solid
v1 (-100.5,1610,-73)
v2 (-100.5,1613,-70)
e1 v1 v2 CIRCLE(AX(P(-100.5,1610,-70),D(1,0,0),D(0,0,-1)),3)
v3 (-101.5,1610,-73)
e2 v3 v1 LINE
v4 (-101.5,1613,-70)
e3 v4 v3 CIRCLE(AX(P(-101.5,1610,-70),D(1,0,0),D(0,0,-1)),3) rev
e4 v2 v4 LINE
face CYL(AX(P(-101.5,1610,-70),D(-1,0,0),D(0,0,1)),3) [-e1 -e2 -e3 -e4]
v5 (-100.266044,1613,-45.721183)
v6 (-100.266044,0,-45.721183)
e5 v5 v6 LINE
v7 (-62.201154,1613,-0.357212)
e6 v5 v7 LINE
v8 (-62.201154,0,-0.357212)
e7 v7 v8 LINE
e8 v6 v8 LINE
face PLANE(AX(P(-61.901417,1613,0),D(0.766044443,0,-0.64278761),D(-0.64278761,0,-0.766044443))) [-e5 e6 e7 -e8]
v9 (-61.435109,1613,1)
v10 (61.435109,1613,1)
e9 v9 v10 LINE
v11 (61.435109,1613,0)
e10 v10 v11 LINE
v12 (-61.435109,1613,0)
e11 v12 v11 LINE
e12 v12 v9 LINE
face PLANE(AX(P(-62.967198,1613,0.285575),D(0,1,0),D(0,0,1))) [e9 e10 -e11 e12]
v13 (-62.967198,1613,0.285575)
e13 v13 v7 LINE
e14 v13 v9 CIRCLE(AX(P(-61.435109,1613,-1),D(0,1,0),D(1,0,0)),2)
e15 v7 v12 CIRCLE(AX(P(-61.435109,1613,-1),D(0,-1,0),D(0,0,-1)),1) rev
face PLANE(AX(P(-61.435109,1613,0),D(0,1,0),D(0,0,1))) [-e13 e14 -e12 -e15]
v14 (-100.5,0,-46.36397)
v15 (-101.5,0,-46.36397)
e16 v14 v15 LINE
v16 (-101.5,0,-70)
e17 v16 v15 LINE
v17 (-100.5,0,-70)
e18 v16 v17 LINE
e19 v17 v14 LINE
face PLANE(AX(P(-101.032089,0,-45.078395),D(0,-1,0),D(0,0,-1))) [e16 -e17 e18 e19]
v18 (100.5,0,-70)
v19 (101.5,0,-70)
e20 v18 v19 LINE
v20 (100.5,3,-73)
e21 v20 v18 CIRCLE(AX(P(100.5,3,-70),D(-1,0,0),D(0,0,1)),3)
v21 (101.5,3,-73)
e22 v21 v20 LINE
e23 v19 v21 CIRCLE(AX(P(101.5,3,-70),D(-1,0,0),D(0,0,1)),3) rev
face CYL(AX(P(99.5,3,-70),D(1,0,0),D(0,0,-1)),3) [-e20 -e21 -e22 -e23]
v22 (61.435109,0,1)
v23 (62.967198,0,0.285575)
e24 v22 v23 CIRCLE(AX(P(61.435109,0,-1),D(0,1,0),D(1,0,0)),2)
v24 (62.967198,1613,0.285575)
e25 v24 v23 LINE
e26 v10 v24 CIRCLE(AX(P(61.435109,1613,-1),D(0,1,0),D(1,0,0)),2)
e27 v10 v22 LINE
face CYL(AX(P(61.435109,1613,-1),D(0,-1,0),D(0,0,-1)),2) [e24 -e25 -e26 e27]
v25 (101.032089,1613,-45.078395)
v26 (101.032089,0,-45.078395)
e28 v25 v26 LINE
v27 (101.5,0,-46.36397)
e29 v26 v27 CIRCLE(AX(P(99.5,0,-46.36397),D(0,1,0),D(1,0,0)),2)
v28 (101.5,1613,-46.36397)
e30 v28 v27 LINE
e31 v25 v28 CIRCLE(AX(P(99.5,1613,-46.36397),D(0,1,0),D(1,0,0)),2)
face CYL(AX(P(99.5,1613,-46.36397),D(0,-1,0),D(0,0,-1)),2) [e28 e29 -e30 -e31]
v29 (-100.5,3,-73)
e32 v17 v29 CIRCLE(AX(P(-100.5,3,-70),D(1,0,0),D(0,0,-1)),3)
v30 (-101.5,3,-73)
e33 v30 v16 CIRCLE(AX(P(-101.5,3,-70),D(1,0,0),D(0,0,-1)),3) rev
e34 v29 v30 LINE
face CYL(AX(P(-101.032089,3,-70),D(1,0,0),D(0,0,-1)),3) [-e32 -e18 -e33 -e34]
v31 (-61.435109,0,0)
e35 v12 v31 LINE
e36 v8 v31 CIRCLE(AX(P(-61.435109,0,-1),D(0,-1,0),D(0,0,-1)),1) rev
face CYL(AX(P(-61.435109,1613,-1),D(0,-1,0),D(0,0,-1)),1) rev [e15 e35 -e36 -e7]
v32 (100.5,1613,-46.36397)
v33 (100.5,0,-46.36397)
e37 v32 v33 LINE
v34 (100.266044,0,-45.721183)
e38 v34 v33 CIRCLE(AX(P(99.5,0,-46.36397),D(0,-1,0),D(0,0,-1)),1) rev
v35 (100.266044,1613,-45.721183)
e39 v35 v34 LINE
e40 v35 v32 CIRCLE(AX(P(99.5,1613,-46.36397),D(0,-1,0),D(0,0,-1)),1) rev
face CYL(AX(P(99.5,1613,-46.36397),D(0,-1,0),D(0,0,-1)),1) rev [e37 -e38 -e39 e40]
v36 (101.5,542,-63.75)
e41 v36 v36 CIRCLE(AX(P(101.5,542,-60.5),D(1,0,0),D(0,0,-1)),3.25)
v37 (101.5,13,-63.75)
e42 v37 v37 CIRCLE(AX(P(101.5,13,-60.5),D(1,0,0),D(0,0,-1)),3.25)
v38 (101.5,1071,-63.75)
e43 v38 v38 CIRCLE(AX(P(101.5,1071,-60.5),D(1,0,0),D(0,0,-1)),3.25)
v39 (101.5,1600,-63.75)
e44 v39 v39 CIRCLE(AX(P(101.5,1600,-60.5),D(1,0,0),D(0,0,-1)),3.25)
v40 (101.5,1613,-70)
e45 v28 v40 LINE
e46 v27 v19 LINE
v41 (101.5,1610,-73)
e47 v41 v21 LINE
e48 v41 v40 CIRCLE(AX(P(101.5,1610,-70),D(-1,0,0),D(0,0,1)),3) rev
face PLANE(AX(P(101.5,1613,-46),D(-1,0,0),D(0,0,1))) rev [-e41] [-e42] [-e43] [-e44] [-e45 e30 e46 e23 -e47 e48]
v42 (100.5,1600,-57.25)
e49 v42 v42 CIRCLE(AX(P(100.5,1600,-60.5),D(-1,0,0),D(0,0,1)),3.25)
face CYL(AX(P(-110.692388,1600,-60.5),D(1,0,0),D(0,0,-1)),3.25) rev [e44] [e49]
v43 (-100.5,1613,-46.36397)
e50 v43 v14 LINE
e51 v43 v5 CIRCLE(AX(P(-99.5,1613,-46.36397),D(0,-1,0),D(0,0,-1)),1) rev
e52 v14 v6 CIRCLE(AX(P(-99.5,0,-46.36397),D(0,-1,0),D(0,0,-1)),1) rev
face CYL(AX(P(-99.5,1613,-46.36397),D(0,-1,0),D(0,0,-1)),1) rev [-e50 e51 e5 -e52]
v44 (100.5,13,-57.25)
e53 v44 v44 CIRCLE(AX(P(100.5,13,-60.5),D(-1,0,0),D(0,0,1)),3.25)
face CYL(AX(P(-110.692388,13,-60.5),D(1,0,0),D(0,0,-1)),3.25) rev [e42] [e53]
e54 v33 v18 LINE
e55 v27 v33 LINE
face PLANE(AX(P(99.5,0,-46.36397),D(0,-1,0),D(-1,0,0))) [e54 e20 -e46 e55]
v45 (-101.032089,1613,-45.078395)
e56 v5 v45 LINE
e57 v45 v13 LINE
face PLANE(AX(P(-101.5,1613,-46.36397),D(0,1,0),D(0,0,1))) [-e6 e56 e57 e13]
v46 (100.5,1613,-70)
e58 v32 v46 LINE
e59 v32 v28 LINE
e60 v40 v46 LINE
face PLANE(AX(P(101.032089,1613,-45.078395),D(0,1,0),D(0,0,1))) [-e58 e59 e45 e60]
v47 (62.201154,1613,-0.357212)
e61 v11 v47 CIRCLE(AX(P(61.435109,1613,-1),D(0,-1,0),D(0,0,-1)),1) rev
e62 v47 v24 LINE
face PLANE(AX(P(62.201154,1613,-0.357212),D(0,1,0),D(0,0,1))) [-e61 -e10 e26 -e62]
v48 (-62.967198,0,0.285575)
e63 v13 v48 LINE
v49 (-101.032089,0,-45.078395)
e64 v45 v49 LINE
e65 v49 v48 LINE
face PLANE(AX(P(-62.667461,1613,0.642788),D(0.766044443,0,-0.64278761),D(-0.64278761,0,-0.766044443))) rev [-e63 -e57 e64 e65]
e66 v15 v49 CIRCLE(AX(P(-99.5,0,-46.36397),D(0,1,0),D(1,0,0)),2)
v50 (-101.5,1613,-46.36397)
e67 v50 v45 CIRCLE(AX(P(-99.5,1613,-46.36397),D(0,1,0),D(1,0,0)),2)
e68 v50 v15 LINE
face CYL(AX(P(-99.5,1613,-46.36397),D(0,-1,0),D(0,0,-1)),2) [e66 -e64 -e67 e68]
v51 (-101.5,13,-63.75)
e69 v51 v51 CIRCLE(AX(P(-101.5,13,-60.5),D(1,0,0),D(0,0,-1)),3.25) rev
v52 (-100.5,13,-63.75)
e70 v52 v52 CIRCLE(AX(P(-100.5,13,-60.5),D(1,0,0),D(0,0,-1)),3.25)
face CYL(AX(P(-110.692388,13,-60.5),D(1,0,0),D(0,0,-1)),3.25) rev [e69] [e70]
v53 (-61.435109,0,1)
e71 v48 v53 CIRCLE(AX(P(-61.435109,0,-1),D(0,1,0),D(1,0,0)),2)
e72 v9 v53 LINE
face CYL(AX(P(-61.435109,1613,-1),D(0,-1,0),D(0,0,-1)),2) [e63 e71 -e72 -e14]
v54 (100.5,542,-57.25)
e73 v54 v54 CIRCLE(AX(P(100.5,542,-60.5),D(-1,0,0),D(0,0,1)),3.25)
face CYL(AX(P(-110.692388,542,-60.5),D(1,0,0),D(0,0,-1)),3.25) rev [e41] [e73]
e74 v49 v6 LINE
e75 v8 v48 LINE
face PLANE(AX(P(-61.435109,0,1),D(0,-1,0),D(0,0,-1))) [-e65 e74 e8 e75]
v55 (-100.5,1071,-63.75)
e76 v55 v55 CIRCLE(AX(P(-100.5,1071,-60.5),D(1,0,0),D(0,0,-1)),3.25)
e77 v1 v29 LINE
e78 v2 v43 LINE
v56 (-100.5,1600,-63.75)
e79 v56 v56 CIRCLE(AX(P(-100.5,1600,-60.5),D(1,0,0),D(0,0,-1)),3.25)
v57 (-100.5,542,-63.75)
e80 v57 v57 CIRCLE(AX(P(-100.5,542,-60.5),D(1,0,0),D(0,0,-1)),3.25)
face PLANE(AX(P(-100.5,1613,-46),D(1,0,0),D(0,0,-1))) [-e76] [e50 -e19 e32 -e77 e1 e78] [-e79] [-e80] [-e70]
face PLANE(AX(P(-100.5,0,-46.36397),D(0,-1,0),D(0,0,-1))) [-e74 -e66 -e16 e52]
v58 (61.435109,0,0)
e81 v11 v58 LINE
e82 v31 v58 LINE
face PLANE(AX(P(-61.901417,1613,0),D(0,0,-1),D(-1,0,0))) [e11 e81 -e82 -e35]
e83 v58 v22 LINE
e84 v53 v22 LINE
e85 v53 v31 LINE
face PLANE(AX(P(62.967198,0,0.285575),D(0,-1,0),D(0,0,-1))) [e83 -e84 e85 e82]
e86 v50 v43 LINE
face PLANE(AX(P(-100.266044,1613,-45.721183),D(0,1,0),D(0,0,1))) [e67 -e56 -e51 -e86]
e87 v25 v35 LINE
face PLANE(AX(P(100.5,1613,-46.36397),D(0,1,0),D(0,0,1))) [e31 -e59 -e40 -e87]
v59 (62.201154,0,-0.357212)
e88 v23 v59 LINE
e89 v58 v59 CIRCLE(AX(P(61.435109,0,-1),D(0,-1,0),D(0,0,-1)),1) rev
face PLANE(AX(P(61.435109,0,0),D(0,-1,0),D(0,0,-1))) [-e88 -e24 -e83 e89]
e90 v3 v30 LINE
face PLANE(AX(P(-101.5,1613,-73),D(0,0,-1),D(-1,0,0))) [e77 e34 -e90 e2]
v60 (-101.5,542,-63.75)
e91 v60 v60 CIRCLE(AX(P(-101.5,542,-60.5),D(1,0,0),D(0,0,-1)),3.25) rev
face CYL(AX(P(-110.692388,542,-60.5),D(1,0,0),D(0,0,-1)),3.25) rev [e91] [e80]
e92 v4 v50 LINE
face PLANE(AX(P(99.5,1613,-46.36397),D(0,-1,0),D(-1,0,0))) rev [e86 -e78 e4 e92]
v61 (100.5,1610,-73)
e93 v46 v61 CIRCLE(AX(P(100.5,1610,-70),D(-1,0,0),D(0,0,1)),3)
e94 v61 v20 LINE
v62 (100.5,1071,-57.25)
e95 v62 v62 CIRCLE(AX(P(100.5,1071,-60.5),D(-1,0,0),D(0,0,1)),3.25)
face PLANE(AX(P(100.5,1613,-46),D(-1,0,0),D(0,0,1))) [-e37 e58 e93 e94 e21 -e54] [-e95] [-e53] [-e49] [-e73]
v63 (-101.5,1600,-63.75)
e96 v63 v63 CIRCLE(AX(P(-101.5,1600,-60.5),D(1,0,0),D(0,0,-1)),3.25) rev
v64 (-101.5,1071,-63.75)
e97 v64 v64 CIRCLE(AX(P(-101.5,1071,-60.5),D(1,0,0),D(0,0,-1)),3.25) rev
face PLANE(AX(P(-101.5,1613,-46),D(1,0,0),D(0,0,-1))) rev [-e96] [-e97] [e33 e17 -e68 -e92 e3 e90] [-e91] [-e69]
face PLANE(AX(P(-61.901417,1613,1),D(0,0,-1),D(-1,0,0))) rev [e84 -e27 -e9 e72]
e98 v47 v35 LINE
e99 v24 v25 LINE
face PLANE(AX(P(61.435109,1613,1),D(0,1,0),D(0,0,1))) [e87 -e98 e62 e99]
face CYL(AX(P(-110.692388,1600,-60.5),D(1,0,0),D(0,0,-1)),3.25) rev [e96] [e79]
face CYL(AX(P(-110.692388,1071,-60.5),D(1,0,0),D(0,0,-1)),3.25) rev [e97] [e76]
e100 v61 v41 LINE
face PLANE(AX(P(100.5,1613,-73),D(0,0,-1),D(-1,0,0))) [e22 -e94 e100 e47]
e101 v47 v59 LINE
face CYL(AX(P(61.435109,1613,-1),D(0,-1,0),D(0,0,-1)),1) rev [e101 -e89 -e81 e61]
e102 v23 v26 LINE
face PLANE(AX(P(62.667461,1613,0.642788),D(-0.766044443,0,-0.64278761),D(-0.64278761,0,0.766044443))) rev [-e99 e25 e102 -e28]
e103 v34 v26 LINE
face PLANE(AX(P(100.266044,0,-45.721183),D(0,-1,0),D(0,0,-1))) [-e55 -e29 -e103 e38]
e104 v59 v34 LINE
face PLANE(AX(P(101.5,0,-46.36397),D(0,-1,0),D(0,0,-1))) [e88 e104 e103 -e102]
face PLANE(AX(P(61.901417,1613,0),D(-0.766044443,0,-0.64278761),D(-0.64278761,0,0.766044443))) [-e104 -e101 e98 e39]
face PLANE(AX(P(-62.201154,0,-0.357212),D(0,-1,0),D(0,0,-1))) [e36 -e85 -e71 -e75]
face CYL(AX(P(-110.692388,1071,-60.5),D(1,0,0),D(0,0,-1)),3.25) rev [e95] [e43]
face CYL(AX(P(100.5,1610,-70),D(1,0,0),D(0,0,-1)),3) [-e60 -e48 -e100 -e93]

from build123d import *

# Parameters (mm, degrees)
BASE_FLANGE1_DEPTH = 1613
FILLET1_R          = 3
CUT_EXTRUDE4_REACH = 1629.362
SKETCH10_R         = 3.25
LPATTERN5_COUNT    = 4
LPATTERN5_PITCH    = 529


# Sheet-metal steps are written as plain solids
with BuildPart() as part:
    # Sketch1 → Base-Flange1 (new body)
    with BuildSketch(Plane(origin=(0, 0, 0), x_dir=(1, 0, 0), z_dir=(0, 1, 0))):
        with BuildLine():
            Line((-100.5, 73), (-100.5, 46.363970234))
            ThreePointArc((-100.5, 46.363970234), (-100.439692621, 46.021950091), (-100.266044443, 45.721182625))
            Line((-100.266044443, 45.721182625), (-62.201153751, 0.35721239))
            ThreePointArc((-62.201153751, 0.35721239), (-61.857727569, 0.093692213), (-61.435109308, 0))
            Line((-61.435109308, 0), (61.435109308, 0))
            ThreePointArc((61.435109308, 0), (61.857727569, 0.093692213), (62.201153751, 0.35721239))
            Line((62.201153751, 0.35721239), (100.266044443, 45.721182625))
            ThreePointArc((100.266044443, 45.721182625), (100.439692621, 46.021950091), (100.5, 46.363970234))
            Line((100.5, 46.363970234), (100.5, 73))
            Line((100.5, 73), (101.5, 73))
            Line((101.5, 73), (101.5, 46.363970234))
            ThreePointArc((101.5, 46.363970234), (101.379385242, 45.679929948), (101.032088886, 45.078395015))
            Line((101.032088886, 45.078395015), (62.967198194, -0.285575219))
            ThreePointArc((62.967198194, -0.285575219), (62.280345831, -0.812615574), (61.435109308, -1))
            Line((61.435109308, -1), (-61.435109308, -1))
            ThreePointArc((-61.435109308, -1), (-62.280345831, -0.812615574), (-62.967198194, -0.285575219))
            Line((-62.967198194, -0.285575219), (-101.032088886, 45.078395015))
            ThreePointArc((-101.032088886, 45.078395015), (-101.379385242, 45.679929948), (-101.5, 46.363970234))
            Line((-101.5, 46.363970234), (-101.5, 73))
            Line((-101.5, 73), (-100.5, 73))
        make_face()
    extrude(amount=BASE_FLANGE1_DEPTH)

    # Fillet1
    fillet1_edges = [part.edges().sort_by_distance(p)[0] for p in [
        (-101, 0, -73),
        (101, 0, -73),
        (-101, 1613, -73),
        (101, 1613, -73),
    ]]
    fillet(fillet1_edges, radius=FILLET1_R)

    # Cut-Extrude4: up to this face of the body (flat: up to its plane)
    cut_extrude4_end = Plane(part.part.faces().sort_by_distance((-101.5, 806.5, -59.680847857))[0])
    # Sketch10 → Cut-Extrude4 (cut, up to the picked face)
    with BuildSketch(Plane(origin=(101.5, 0, 0), x_dir=(0, 0, -1), z_dir=(1, 0, 0)), mode=Mode.PRIVATE) as cut_extrude4_sk1:
        with Locations((60.5, 13)):
            Circle(SKETCH10_R)
    cut_extrude4_tool1 = split(extrude(cut_extrude4_sk1.sketch, amount=-CUT_EXTRUDE4_REACH, mode=Mode.PRIVATE), bisect_by=cut_extrude4_end, keep=Keep.BOTH, mode=Mode.PRIVATE)
    cut_extrude4 = cut_extrude4_tool1.solids().sort_by(Axis((101.5, 13, -60.5), (-1, 0, 0)))[0]
    add(cut_extrude4, mode=Mode.SUBTRACT)

    # LPattern5: Cut-Extrude4 ×4
    with Locations(*[(0, i * LPATTERN5_PITCH, 0) for i in range(1, LPATTERN5_COUNT)]):
        add(cut_extrude4, mode=Mode.SUBTRACT)


solid = part.part
